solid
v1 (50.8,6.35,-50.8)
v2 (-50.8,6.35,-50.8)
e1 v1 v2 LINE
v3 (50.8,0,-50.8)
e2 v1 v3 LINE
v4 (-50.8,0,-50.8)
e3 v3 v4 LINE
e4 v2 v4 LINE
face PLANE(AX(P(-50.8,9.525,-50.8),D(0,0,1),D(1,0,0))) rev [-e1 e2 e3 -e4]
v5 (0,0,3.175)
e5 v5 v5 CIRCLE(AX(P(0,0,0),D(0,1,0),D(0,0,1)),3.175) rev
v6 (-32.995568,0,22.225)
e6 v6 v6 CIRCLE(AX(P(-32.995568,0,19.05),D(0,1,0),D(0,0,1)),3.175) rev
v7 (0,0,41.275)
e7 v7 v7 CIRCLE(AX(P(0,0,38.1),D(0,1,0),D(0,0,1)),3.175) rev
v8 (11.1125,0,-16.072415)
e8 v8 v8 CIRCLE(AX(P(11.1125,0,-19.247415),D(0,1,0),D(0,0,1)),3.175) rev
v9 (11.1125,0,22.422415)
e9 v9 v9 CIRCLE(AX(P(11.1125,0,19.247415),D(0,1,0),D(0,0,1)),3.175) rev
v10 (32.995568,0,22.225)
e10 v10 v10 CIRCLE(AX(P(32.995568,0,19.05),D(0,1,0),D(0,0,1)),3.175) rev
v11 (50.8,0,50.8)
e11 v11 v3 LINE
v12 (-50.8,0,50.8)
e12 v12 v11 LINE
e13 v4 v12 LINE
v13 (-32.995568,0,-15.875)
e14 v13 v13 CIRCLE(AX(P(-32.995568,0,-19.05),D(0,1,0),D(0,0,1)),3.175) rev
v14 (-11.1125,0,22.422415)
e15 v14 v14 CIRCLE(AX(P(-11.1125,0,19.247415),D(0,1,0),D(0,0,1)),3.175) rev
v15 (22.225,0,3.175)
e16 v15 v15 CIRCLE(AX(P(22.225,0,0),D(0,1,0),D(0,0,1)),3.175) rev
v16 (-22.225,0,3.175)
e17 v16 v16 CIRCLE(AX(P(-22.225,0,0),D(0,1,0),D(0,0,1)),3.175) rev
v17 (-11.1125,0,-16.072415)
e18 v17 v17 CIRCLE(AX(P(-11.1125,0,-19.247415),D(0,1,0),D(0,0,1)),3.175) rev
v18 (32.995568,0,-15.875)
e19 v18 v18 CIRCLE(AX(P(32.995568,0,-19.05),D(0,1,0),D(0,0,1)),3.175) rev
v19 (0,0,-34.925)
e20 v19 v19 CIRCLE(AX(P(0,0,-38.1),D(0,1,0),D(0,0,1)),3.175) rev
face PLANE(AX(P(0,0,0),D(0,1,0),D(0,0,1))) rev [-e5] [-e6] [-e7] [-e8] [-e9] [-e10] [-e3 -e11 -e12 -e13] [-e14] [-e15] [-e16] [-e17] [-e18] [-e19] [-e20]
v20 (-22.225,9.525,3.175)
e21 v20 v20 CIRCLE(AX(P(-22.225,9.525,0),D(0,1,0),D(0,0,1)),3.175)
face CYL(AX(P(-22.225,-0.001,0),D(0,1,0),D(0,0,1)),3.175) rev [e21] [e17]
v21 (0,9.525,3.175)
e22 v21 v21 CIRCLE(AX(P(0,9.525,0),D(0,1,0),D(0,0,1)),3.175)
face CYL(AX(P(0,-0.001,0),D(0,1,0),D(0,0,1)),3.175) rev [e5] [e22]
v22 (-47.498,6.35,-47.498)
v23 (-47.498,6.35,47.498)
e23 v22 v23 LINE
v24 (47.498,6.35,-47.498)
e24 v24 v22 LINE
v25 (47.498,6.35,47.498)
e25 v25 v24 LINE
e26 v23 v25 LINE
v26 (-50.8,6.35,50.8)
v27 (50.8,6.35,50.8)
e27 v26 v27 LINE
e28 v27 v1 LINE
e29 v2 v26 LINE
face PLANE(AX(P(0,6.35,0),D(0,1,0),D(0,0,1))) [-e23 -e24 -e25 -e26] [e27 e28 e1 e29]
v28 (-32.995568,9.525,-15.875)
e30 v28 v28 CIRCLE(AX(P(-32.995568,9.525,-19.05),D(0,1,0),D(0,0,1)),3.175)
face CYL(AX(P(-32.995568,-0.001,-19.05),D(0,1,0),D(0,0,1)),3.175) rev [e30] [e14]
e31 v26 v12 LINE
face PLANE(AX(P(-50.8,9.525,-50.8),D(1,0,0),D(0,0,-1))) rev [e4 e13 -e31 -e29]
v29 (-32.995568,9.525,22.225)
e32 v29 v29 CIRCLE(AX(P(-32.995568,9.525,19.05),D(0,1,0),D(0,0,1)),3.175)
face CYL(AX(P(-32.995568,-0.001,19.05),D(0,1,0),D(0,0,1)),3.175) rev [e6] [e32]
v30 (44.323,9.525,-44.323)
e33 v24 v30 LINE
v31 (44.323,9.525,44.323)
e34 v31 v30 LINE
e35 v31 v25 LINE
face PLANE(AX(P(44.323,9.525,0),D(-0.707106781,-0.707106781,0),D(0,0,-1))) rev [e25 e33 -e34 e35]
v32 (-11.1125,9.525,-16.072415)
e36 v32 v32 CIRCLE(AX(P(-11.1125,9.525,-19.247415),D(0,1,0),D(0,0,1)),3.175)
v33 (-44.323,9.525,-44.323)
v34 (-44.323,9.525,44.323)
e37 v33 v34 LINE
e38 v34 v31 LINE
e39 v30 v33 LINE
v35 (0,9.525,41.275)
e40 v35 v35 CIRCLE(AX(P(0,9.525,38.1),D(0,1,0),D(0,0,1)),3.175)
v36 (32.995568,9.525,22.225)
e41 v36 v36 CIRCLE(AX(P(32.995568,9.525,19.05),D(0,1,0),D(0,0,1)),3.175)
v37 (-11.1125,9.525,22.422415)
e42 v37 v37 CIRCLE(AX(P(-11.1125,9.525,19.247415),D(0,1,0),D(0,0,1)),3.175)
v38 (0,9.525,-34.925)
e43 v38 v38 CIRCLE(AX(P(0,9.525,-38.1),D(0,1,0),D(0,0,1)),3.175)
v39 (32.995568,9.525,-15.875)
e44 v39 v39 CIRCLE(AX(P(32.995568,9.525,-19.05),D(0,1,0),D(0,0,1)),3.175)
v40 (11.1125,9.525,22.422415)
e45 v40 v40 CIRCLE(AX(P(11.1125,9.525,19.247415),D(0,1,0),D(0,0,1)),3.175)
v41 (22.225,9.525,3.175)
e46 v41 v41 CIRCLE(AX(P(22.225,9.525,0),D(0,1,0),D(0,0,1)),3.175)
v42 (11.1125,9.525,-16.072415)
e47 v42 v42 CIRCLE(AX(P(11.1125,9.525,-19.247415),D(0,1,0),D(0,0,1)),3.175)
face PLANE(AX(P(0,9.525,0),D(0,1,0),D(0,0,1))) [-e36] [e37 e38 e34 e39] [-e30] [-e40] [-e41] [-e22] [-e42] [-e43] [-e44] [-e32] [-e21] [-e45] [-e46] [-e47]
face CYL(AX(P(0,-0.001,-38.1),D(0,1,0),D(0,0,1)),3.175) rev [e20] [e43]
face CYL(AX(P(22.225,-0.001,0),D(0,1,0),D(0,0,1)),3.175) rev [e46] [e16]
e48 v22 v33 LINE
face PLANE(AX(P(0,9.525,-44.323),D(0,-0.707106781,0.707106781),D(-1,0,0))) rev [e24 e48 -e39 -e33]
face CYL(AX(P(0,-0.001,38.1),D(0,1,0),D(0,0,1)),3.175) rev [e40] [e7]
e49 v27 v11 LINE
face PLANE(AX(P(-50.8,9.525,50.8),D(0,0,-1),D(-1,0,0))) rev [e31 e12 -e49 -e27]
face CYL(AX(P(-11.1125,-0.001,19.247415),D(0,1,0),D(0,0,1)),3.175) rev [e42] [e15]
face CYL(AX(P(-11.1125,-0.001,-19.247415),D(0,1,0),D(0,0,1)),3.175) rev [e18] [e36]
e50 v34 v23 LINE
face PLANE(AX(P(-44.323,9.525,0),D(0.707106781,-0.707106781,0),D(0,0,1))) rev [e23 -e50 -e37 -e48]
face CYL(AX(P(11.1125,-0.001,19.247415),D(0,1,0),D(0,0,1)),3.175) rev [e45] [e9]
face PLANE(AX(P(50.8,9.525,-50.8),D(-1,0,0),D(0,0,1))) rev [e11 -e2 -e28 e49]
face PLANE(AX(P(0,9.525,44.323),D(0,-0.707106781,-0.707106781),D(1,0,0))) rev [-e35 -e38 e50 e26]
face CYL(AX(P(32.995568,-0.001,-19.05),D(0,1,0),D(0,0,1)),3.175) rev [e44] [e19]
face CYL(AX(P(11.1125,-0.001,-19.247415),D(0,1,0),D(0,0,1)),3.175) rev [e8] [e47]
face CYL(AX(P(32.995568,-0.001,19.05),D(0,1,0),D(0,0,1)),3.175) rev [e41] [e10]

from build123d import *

# Parameters (mm, degrees)
SKETCH1_W           = 101.6
SKETCH1_H           = 101.6
BOSS_EXTRUDE1_DEPTH = 9.525
SKETCH2_OUTSIDE_W   = 132.4
SKETCH2_OUTSIDE_H   = 132.4
SKETCH2_OUTSIDE_W_2 = 94.996
SKETCH2_OUTSIDE_H_2 = 94.996
CUT_EXTRUDE1_DEPTH  = 3.175
CHAMFER1_SIZE       = 3.175
CUT_EXTRUDE2_REACH  = 74.471
SKETCH3_R           = 3.175


with BuildPart() as part:
    # Sketch1 → Boss-Extrude1 (new body)
    with BuildSketch(Plane(origin=(0, 0, 0), x_dir=(1, 0, 0), z_dir=(0, 1, 0))):
        Rectangle(SKETCH1_W, SKETCH1_H)
    extrude(amount=BOSS_EXTRUDE1_DEPTH)

    # Sketch2 outside → Cut-Extrude1 (cut)
    with BuildSketch(Plane(origin=(0, 9.525, 0), x_dir=(1, 0, 0), z_dir=(0, 1, 0))):
        Rectangle(SKETCH2_OUTSIDE_W, SKETCH2_OUTSIDE_H)
        Rectangle(SKETCH2_OUTSIDE_W_2, SKETCH2_OUTSIDE_H_2, mode=Mode.SUBTRACT)
    extrude(amount=-CUT_EXTRUDE1_DEPTH, mode=Mode.SUBTRACT)

    # Chamfer1
    chamfer1_edges = [part.edges().sort_by_distance(p)[0] for p in [
        (47.498, 9.525, 0),
        (0, 9.525, -47.498),
        (-47.498, 9.525, 0),
        (0, 9.525, 47.498),
    ]]
    chamfer(chamfer1_edges, length=CHAMFER1_SIZE - 0.0001)  # a hair under: the kernel refuses the full size

    # Sketch3 → Cut-Extrude2 (cut, up to next)
    with BuildSketch(Plane(origin=(0, 9.525, 0), x_dir=(1, 0, 0), z_dir=(0, 1, 0)), mode=Mode.PRIVATE) as cut_extrude2_sk1:
        with Locations(Location((0, 38.1, 0), (0, 0, 270))):
            Circle(SKETCH3_R)
    cut_extrude2_tool1 = extrude(cut_extrude2_sk1.sketch, amount=-CUT_EXTRUDE2_REACH, mode=Mode.PRIVATE) & part.part
    # Sketch3 → Cut-Extrude2 (cut, up to next)
    with BuildSketch(Plane(origin=(0, 9.525, 0), x_dir=(1, 0, 0), z_dir=(0, 1, 0)), mode=Mode.PRIVATE) as cut_extrude2_sk2:
        with Locations(Location((32.995567884, 19.05, 0), (0, 0, 270))):
            Circle(SKETCH3_R)
    cut_extrude2_tool2 = extrude(cut_extrude2_sk2.sketch, amount=-CUT_EXTRUDE2_REACH, mode=Mode.PRIVATE) & part.part
    # Sketch3 → Cut-Extrude2 (cut, up to next)
    with BuildSketch(Plane(origin=(0, 9.525, 0), x_dir=(1, 0, 0), z_dir=(0, 1, 0)), mode=Mode.PRIVATE) as cut_extrude2_sk3:
        with Locations(Location((32.995567884, -19.05, 0), (0, 0, 270))):
            Circle(SKETCH3_R)
    cut_extrude2_tool3 = extrude(cut_extrude2_sk3.sketch, amount=-CUT_EXTRUDE2_REACH, mode=Mode.PRIVATE) & part.part
    # Sketch3 → Cut-Extrude2 (cut, up to next)
    with BuildSketch(Plane(origin=(0, 9.525, 0), x_dir=(1, 0, 0), z_dir=(0, 1, 0)), mode=Mode.PRIVATE) as cut_extrude2_sk4:
        with Locations(Location((0, -38.1, 0), (0, 0, 270))):
            Circle(SKETCH3_R)
    cut_extrude2_tool4 = extrude(cut_extrude2_sk4.sketch, amount=-CUT_EXTRUDE2_REACH, mode=Mode.PRIVATE) & part.part
    # Sketch3 → Cut-Extrude2 (cut, up to next)
    with BuildSketch(Plane(origin=(0, 9.525, 0), x_dir=(1, 0, 0), z_dir=(0, 1, 0)), mode=Mode.PRIVATE) as cut_extrude2_sk5:
        with Locations(Location((-32.995567884, -19.05, 0), (0, 0, 270))):
            Circle(SKETCH3_R)
    cut_extrude2_tool5 = extrude(cut_extrude2_sk5.sketch, amount=-CUT_EXTRUDE2_REACH, mode=Mode.PRIVATE) & part.part
    # Sketch3 → Cut-Extrude2 (cut, up to next)
    with BuildSketch(Plane(origin=(0, 9.525, 0), x_dir=(1, 0, 0), z_dir=(0, 1, 0)), mode=Mode.PRIVATE) as cut_extrude2_sk6:
        with Locations(Location((-32.995567884, 19.05, 0), (0, 0, 270))):
            Circle(SKETCH3_R)
    cut_extrude2_tool6 = extrude(cut_extrude2_sk6.sketch, amount=-CUT_EXTRUDE2_REACH, mode=Mode.PRIVATE) & part.part
    # Sketch3 → Cut-Extrude2 (cut, up to next)
    with BuildSketch(Plane(origin=(0, 9.525, 0), x_dir=(1, 0, 0), z_dir=(0, 1, 0)), mode=Mode.PRIVATE) as cut_extrude2_sk7:
        with Locations(Location((22.225, 0, 0), (0, 0, 270))):
            Circle(SKETCH3_R)
    cut_extrude2_tool7 = extrude(cut_extrude2_sk7.sketch, amount=-CUT_EXTRUDE2_REACH, mode=Mode.PRIVATE) & part.part
    # Sketch3 → Cut-Extrude2 (cut, up to next)
    with BuildSketch(Plane(origin=(0, 9.525, 0), x_dir=(1, 0, 0), z_dir=(0, 1, 0)), mode=Mode.PRIVATE) as cut_extrude2_sk8:
        with Locations(Location((11.1125, -19.247414599, 0), (0, 0, 270))):
            Circle(SKETCH3_R)
    cut_extrude2_tool8 = extrude(cut_extrude2_sk8.sketch, amount=-CUT_EXTRUDE2_REACH, mode=Mode.PRIVATE) & part.part
    # Sketch3 → Cut-Extrude2 (cut, up to next)
    with BuildSketch(Plane(origin=(0, 9.525, 0), x_dir=(1, 0, 0), z_dir=(0, 1, 0)), mode=Mode.PRIVATE) as cut_extrude2_sk9:
        with Locations(Location((-11.1125, -19.247414599, 0), (0, 0, 270))):
            Circle(SKETCH3_R)
    cut_extrude2_tool9 = extrude(cut_extrude2_sk9.sketch, amount=-CUT_EXTRUDE2_REACH, mode=Mode.PRIVATE) & part.part
    # Sketch3 → Cut-Extrude2 (cut, up to next)
    with BuildSketch(Plane(origin=(0, 9.525, 0), x_dir=(1, 0, 0), z_dir=(0, 1, 0)), mode=Mode.PRIVATE) as cut_extrude2_sk10:
        with Locations(Location((-22.225, 0, 0), (0, 0, 270))):
            Circle(SKETCH3_R)
    cut_extrude2_tool10 = extrude(cut_extrude2_sk10.sketch, amount=-CUT_EXTRUDE2_REACH, mode=Mode.PRIVATE) & part.part
    # Sketch3 → Cut-Extrude2 (cut, up to next)
    with BuildSketch(Plane(origin=(0, 9.525, 0), x_dir=(1, 0, 0), z_dir=(0, 1, 0)), mode=Mode.PRIVATE) as cut_extrude2_sk11:
        with Locations(Location((-11.1125, 19.247414599, 0), (0, 0, 270))):
            Circle(SKETCH3_R)
    cut_extrude2_tool11 = extrude(cut_extrude2_sk11.sketch, amount=-CUT_EXTRUDE2_REACH, mode=Mode.PRIVATE) & part.part
    # Sketch3 → Cut-Extrude2 (cut, up to next)
    with BuildSketch(Plane(origin=(0, 9.525, 0), x_dir=(1, 0, 0), z_dir=(0, 1, 0)), mode=Mode.PRIVATE) as cut_extrude2_sk12:
        with Locations(Location((11.1125, 19.247414599, 0), (0, 0, 270))):
            Circle(SKETCH3_R)
    cut_extrude2_tool12 = extrude(cut_extrude2_sk12.sketch, amount=-CUT_EXTRUDE2_REACH, mode=Mode.PRIVATE) & part.part
    # Sketch3 → Cut-Extrude2 (cut, up to next)
    with BuildSketch(Plane(origin=(0, 9.525, 0), x_dir=(1, 0, 0), z_dir=(0, 1, 0)), mode=Mode.PRIVATE) as cut_extrude2_sk13:
        with Locations(Location((0, 0, 0), (0, 0, 270))):
            Circle(SKETCH3_R)
    cut_extrude2_tool13 = extrude(cut_extrude2_sk13.sketch, amount=-CUT_EXTRUDE2_REACH, mode=Mode.PRIVATE) & part.part
    add(cut_extrude2_tool1.solids().sort_by_distance((0, 9.525, -38.1))[0], mode=Mode.SUBTRACT)
    add(cut_extrude2_tool2.solids().sort_by_distance((32.995568, 9.525, -19.05))[0], mode=Mode.SUBTRACT)
    add(cut_extrude2_tool3.solids().sort_by_distance((32.995568, 9.525, 19.05))[0], mode=Mode.SUBTRACT)
    add(cut_extrude2_tool4.solids().sort_by_distance((0, 9.525, 38.1))[0], mode=Mode.SUBTRACT)
    add(cut_extrude2_tool5.solids().sort_by_distance((-32.995568, 9.525, 19.05))[0], mode=Mode.SUBTRACT)
    add(cut_extrude2_tool6.solids().sort_by_distance((-32.995568, 9.525, -19.05))[0], mode=Mode.SUBTRACT)
    add(cut_extrude2_tool7.solids().sort_by_distance((22.225, 9.525, 0))[0], mode=Mode.SUBTRACT)
    add(cut_extrude2_tool8.solids().sort_by_distance((11.1125, 9.525, 19.247415))[0], mode=Mode.SUBTRACT)
    add(cut_extrude2_tool9.solids().sort_by_distance((-11.1125, 9.525, 19.247415))[0], mode=Mode.SUBTRACT)
    add(cut_extrude2_tool10.solids().sort_by_distance((-22.225, 9.525, 0))[0], mode=Mode.SUBTRACT)
    add(cut_extrude2_tool11.solids().sort_by_distance((-11.1125, 9.525, -19.247415))[0], mode=Mode.SUBTRACT)
    add(cut_extrude2_tool12.solids().sort_by_distance((11.1125, 9.525, -19.247415))[0], mode=Mode.SUBTRACT)
    add(cut_extrude2_tool13.solids().sort_by_distance((0, 9.525, 0))[0], mode=Mode.SUBTRACT)


solid = part.part
